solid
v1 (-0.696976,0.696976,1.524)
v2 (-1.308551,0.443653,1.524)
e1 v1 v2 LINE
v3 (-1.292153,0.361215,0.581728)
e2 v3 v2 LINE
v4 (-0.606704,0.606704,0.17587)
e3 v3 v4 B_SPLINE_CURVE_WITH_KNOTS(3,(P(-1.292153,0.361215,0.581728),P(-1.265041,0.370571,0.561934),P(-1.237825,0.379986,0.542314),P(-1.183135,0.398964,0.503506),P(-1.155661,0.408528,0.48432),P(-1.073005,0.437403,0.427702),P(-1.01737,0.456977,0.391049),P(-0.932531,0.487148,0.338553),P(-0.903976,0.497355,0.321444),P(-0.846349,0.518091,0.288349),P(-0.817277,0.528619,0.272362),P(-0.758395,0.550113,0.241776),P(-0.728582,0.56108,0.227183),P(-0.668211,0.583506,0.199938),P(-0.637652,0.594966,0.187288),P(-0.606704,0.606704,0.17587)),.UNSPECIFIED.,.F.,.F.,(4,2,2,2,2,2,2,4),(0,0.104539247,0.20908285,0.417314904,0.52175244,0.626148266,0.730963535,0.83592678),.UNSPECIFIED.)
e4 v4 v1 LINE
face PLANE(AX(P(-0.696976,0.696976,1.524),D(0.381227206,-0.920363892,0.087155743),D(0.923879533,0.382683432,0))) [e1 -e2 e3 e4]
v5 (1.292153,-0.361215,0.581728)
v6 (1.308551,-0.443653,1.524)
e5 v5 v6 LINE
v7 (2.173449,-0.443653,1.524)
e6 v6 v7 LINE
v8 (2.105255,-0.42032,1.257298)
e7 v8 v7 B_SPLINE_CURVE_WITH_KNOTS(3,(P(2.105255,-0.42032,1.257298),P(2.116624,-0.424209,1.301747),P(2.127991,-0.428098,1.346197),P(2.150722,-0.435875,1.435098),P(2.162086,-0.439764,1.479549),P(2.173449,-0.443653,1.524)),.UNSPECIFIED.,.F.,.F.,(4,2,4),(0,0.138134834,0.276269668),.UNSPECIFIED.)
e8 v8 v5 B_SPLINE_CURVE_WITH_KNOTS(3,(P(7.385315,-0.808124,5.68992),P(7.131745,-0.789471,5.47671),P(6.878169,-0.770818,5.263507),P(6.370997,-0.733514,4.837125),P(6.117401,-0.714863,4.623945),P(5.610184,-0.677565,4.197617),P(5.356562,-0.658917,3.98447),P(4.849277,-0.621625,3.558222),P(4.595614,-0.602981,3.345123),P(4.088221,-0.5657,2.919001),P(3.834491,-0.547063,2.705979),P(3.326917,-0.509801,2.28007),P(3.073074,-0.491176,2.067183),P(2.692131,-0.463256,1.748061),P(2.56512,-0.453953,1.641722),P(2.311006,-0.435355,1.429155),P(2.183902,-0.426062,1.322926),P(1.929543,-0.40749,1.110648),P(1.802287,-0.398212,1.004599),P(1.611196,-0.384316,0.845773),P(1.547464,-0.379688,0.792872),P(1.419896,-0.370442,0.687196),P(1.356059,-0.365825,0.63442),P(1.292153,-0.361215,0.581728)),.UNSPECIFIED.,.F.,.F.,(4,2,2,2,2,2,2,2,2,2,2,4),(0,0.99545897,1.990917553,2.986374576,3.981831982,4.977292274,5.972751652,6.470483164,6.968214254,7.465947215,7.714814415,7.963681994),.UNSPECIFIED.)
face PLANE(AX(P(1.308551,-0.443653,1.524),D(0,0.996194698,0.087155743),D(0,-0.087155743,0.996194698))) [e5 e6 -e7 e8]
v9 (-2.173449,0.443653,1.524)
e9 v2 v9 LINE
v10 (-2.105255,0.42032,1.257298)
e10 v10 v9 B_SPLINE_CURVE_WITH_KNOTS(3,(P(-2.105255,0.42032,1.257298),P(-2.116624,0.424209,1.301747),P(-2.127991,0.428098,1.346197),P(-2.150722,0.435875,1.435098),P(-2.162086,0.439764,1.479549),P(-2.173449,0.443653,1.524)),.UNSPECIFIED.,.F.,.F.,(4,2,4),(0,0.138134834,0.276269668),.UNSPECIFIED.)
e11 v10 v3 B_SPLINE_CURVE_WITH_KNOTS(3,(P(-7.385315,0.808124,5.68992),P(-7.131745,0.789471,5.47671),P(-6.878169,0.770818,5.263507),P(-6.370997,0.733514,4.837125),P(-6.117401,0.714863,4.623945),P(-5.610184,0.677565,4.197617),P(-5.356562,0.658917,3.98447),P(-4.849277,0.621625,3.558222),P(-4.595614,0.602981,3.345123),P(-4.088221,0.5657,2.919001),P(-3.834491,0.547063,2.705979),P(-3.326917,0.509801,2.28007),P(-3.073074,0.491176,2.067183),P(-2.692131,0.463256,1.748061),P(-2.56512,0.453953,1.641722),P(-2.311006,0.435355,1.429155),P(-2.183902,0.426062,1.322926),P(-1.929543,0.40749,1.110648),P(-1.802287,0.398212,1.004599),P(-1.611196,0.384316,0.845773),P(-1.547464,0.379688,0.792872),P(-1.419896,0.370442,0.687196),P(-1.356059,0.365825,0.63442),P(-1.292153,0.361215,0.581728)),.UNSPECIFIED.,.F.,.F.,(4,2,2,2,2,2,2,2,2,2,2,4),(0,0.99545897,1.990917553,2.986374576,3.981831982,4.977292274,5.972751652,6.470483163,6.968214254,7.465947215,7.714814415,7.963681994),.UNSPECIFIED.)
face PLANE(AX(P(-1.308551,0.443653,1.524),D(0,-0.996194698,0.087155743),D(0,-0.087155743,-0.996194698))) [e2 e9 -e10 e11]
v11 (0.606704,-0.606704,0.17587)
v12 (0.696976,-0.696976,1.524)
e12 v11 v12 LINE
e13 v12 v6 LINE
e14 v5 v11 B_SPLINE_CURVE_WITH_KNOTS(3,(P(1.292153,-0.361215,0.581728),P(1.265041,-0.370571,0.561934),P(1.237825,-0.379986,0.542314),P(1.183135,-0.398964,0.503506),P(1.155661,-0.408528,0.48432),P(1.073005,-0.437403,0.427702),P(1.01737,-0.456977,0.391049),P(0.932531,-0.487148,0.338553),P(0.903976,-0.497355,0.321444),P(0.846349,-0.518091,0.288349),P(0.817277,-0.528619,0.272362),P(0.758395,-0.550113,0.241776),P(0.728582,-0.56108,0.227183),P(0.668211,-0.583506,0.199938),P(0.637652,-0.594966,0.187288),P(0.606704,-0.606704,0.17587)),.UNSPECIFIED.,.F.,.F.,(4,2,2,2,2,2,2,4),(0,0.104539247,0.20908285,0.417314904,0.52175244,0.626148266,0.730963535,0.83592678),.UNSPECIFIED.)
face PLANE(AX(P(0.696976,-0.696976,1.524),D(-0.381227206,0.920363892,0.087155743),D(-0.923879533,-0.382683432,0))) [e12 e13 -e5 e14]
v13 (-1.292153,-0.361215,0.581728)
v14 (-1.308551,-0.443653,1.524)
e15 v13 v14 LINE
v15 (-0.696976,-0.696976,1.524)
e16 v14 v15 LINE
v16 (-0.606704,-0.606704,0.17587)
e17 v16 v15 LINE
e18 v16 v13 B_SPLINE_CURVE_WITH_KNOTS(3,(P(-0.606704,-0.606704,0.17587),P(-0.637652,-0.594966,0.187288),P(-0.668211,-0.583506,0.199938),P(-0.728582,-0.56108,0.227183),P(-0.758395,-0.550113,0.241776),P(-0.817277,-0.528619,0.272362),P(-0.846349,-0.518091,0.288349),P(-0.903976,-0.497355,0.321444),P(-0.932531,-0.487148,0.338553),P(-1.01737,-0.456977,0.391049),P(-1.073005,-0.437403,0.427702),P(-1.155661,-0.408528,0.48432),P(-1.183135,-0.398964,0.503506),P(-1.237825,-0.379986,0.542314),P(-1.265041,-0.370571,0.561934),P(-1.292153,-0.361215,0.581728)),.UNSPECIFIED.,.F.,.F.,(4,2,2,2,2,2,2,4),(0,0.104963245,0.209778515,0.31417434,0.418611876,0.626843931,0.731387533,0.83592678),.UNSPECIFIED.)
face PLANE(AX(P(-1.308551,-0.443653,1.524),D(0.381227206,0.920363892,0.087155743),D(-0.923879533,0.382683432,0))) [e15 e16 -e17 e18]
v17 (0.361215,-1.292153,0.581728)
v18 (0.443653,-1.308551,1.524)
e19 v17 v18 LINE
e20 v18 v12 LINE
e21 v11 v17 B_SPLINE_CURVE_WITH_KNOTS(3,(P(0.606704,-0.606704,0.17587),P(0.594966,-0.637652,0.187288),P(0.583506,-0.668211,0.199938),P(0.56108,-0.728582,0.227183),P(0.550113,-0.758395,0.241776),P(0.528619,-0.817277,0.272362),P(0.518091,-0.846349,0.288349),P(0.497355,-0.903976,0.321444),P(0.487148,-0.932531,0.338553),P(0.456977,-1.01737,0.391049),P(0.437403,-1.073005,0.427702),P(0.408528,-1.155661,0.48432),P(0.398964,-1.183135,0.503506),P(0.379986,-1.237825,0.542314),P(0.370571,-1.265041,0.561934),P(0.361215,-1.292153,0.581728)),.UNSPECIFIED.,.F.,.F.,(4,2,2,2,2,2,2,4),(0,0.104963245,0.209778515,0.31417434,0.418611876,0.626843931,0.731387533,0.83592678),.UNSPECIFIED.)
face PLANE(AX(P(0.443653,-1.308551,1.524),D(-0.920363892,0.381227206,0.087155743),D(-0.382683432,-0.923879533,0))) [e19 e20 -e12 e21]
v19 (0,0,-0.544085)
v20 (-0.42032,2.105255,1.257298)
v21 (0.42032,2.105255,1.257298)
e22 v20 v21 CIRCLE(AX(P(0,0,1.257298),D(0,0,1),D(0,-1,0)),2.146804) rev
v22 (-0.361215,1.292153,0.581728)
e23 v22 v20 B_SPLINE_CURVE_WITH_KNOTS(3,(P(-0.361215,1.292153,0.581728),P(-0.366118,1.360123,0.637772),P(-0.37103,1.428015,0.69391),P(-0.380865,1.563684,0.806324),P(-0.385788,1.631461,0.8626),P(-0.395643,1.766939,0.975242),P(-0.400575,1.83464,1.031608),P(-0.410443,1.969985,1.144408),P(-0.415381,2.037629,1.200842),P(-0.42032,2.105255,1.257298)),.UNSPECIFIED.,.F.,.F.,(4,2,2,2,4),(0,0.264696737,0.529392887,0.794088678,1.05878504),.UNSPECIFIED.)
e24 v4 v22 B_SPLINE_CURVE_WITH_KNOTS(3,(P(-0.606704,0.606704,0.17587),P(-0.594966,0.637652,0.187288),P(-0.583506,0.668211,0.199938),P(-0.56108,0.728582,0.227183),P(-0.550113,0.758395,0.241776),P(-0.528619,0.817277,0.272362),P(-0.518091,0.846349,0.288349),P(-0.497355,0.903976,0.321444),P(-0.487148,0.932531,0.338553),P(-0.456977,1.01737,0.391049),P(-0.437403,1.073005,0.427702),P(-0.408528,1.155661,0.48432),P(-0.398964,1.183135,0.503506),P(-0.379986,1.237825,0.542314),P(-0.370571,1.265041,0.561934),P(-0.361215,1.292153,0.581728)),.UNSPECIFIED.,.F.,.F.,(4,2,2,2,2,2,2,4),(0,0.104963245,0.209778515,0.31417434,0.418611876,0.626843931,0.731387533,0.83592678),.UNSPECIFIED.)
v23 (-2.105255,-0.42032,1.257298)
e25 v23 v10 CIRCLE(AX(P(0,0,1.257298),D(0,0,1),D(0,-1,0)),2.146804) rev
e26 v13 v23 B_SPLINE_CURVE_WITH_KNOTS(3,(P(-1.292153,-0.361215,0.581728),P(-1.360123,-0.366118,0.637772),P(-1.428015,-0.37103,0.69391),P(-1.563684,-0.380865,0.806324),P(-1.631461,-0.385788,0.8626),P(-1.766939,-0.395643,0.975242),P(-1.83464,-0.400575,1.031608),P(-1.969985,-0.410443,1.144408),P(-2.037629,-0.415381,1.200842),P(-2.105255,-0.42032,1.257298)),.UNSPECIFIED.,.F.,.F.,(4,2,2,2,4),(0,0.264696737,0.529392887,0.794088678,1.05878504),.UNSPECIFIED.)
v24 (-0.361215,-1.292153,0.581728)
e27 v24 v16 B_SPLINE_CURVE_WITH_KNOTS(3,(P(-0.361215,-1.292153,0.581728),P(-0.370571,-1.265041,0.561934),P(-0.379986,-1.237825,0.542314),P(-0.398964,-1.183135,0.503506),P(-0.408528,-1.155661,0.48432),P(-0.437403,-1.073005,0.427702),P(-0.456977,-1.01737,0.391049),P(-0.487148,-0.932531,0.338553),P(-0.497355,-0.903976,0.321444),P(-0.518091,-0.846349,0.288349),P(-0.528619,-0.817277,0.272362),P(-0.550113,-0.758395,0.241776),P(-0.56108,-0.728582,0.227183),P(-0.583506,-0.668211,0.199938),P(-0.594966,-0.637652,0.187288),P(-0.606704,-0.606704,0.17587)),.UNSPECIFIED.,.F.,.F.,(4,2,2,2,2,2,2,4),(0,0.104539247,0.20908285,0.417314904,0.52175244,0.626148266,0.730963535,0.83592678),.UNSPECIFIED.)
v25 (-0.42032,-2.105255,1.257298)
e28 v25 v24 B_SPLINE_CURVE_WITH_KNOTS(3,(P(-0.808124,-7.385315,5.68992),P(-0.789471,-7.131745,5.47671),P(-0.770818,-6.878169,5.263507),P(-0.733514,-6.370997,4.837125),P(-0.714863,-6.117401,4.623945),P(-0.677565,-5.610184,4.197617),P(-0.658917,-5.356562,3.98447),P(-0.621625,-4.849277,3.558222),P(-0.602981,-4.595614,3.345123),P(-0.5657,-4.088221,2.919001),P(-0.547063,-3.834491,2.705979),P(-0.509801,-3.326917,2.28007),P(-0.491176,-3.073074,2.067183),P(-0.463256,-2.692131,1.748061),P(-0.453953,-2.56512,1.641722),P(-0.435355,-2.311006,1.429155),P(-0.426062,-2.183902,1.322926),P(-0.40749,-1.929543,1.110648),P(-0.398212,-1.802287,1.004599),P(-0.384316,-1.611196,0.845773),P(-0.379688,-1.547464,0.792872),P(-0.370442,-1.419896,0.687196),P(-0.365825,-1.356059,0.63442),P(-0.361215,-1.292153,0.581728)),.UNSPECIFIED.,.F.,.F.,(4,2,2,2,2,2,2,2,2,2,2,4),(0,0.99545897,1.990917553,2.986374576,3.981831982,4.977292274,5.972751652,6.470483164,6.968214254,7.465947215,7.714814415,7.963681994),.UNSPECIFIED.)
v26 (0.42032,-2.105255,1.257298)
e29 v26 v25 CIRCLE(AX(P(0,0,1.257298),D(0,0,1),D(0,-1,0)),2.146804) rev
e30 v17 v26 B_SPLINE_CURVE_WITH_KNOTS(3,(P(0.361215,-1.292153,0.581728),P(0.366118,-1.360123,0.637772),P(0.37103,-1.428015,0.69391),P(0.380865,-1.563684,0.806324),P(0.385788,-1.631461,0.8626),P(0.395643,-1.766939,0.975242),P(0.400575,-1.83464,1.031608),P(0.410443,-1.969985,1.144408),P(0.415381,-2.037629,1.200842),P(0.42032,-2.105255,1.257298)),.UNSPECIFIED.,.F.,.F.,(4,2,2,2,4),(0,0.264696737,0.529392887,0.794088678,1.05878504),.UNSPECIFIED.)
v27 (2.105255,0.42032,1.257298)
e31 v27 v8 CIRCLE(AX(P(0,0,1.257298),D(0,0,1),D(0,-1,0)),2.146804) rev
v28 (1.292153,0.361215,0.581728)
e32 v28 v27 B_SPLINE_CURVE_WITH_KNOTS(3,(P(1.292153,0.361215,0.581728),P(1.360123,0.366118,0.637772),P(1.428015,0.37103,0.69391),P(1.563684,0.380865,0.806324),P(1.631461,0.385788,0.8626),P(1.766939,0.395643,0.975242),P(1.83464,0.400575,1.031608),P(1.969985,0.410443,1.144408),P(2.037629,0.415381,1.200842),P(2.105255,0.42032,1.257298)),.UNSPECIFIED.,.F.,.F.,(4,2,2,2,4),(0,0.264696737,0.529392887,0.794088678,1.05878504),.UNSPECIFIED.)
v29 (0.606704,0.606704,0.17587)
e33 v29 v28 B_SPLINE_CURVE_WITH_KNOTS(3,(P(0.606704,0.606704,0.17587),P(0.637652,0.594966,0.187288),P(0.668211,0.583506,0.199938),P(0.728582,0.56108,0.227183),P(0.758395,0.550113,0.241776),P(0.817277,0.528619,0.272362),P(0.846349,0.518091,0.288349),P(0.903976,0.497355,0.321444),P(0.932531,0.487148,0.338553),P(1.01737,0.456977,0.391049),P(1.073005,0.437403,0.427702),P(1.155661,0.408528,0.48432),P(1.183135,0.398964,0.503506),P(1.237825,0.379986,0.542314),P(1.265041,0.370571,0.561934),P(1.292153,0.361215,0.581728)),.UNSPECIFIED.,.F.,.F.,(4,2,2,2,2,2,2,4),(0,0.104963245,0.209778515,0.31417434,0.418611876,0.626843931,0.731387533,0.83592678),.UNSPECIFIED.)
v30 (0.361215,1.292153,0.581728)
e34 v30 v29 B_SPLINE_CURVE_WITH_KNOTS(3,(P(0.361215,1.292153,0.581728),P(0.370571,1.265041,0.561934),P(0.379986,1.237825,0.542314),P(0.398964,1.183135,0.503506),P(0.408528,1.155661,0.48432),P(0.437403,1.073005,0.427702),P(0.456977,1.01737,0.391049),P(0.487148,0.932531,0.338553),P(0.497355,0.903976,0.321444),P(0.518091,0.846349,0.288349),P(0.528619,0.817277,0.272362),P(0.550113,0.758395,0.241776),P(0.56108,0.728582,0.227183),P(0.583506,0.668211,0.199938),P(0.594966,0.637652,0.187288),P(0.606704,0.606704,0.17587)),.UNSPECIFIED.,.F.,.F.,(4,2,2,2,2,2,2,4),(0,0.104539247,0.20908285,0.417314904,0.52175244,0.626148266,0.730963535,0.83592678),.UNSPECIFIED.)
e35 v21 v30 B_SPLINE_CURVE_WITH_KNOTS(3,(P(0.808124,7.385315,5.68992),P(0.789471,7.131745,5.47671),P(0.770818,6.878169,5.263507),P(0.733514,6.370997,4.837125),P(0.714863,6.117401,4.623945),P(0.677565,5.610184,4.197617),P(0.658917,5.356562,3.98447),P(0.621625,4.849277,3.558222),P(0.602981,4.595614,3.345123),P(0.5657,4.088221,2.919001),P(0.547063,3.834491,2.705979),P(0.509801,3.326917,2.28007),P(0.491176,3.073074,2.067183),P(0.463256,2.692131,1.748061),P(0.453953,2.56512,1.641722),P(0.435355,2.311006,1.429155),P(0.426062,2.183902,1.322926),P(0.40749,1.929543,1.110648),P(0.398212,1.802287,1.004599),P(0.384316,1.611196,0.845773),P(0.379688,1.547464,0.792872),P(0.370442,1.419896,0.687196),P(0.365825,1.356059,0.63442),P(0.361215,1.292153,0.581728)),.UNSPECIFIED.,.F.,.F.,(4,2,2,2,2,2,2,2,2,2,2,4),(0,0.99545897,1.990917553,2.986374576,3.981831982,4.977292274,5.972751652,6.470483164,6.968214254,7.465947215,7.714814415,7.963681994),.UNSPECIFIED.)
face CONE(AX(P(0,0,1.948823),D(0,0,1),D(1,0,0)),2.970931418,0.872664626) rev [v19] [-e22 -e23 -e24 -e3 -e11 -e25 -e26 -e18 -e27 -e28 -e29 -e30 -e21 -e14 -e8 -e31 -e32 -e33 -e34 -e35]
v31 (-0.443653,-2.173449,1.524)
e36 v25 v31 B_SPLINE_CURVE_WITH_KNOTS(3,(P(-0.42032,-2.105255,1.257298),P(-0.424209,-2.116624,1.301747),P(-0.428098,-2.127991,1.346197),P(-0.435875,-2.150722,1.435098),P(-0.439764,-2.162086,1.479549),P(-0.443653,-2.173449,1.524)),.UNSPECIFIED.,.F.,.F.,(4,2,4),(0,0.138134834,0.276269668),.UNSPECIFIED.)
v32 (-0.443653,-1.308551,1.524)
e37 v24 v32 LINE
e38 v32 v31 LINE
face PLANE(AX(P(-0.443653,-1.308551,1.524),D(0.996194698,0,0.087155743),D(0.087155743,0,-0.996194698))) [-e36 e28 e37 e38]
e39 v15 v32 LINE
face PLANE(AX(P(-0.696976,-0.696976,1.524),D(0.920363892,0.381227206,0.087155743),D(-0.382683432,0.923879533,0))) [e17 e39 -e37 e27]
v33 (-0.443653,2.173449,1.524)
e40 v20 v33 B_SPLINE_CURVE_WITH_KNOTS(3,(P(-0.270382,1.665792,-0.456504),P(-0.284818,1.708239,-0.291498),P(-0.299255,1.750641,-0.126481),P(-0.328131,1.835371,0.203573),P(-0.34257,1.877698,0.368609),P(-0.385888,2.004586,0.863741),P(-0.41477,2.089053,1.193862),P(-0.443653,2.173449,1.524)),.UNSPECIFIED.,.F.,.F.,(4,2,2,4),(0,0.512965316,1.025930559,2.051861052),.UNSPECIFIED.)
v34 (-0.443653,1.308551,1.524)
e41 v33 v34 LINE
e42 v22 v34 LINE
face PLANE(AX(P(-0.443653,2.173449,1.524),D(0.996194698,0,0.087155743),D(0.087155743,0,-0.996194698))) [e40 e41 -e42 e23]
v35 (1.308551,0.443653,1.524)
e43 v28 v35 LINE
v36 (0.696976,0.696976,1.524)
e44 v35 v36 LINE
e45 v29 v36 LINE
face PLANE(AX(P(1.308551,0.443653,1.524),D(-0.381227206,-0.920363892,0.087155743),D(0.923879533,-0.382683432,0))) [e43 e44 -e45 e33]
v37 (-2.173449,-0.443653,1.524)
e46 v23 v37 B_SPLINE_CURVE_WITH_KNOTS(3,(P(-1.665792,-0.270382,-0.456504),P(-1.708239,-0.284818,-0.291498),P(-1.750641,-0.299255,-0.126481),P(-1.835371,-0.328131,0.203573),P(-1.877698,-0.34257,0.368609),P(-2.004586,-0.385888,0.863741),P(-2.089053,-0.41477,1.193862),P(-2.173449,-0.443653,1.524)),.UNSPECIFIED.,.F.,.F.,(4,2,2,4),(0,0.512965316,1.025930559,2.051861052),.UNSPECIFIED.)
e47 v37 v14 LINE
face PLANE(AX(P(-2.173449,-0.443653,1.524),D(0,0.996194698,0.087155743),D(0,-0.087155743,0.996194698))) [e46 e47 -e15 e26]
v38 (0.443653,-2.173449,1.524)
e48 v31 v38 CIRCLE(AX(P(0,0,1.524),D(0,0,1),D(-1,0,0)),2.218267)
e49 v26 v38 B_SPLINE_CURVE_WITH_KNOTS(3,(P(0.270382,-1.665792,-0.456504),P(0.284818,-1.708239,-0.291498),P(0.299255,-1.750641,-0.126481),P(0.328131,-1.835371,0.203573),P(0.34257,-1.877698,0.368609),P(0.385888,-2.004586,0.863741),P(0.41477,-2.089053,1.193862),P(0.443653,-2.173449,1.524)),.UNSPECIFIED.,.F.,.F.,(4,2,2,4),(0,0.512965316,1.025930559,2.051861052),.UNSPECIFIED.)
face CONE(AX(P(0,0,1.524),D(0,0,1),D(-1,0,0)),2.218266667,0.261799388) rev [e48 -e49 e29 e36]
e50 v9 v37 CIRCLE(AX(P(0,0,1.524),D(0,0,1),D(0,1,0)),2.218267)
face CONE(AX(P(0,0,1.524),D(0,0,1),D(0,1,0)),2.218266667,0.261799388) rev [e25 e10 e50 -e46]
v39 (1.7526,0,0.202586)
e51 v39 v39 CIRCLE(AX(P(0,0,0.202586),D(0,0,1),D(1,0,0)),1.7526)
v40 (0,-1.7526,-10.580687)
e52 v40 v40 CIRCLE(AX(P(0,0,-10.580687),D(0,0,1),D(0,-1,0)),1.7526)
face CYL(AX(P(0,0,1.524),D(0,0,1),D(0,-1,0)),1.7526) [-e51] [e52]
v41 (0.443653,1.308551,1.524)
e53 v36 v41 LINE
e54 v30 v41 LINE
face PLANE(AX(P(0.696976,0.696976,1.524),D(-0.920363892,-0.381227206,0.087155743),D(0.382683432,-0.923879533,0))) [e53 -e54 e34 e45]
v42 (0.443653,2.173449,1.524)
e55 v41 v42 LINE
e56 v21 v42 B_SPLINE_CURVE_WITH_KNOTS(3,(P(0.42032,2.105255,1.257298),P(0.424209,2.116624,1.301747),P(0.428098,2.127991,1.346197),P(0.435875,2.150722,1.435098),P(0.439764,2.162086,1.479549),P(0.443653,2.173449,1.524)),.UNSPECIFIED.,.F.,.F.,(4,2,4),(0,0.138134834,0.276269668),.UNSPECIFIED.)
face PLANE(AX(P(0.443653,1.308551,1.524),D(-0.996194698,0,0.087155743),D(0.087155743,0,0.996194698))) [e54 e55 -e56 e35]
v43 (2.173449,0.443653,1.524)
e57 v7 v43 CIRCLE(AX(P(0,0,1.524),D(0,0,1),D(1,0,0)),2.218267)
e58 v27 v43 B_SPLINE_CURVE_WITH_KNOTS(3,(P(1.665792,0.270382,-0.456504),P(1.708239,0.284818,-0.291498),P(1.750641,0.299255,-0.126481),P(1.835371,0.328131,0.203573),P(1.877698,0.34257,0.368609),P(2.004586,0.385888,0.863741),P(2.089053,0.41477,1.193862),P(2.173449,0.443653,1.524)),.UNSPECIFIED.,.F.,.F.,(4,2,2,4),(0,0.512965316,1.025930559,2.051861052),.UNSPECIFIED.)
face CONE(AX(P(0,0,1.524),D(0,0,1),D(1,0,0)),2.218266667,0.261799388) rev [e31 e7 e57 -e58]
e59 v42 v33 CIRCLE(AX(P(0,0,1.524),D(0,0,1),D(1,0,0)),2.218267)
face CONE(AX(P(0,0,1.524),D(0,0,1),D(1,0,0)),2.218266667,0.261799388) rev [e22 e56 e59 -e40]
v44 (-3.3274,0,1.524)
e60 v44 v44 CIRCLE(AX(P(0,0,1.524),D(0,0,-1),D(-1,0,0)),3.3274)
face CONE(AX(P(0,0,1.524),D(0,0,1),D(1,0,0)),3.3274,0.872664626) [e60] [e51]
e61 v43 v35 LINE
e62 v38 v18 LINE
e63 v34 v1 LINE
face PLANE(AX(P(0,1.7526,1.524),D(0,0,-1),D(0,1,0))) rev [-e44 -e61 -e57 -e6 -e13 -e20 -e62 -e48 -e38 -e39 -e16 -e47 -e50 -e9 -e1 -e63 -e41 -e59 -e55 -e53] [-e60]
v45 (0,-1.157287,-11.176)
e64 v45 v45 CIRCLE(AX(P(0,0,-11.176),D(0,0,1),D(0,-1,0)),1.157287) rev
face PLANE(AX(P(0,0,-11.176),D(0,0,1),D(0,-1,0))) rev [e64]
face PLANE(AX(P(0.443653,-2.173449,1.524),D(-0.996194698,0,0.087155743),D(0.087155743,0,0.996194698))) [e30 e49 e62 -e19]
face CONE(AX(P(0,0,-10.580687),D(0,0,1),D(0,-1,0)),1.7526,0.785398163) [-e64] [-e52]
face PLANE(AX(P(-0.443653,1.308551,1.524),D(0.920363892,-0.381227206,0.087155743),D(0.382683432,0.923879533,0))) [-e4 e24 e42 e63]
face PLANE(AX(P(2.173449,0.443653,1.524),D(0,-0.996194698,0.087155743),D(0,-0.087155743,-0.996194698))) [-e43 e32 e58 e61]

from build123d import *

# Parameters (mm, degrees)
SKETCH1_R          = 3.3274
EXTRUDE3_DEPTH     = 1.524
SKETCH4_W          = 12.7
SKETCH4_H          = 1.7526
CHAMFER1_SIZE      = 0.5953125
SKETCH26_R         = 0.8763
EXTRUDE8_DEPTH     = 1.524
CUT_EXTRUDE3_REACH = 15.544
CIRPATTERN1_COUNT  = 4
DRAFT2_ANGLE       = 5


# Read off the part's stored shape, not the designer's step: Extrude10, Draft1
with BuildPart() as part:
    # Sketch1 → Extrude3 (new body)
    with BuildSketch(Plane.XY):
        with Locations(Location((0, 0, 0), (0, 0, 180))):
            Circle(SKETCH1_R)
    extrude(amount=EXTRUDE3_DEPTH)

    # Sketch11 → Cut-Revolve3 (revolve, cut)
    with BuildSketch(Plane(origin=(0, 0, 0), x_dir=(0, 0, -1), z_dir=(1, 0, 0)), mode=Mode.PRIVATE) as cut_revolve3_sk:
        Polygon((0, 1.511167525), (-1.524, 3.3274), (0, 3.3274), align=None)
    revolve(cut_revolve3_sk.sketch.rotate(Axis((0, 0, -0.441444004), (0, 0, 1)), 90), axis=Axis((0, 0, -0.441444004), (0, 0, 1)), mode=Mode.SUBTRACT)

    # Extrude10 outline → Extrude10 (revolve)
    with BuildSketch(Plane.XZ):
        Polygon((1.7526, 0), (1.7526, 0.202585901), (1.511167525, 0.202585901), (1.511167525, 0), (0, 0), (0, -1.7526), align=None)
    revolve(axis=Axis((0, 0, 0), (0, 0, 1)))



with BuildPart() as body_2:
    # Sketch4 → Revolve1 (revolve)
    with BuildSketch(Plane(origin=(0, 0, 0), x_dir=(0, 0, -1), z_dir=(1, 0, 0)), mode=Mode.PRIVATE) as revolve1_sk:
        with Locations((4.826, 0.8763)):
            Rectangle(SKETCH4_W, SKETCH4_H)
    revolve(revolve1_sk.sketch.rotate(Axis((0, 0, 1.524), (0, 0, -1)), 180), axis=Axis((0, 0, 1.524), (0, 0, -1)))

    # Chamfer1
    chamfer1_edges = [body_2.edges().sort_by_distance(p)[0] for p in [
        (0, 1.7526, -11.176),
    ]]
    chamfer(chamfer1_edges, length=CHAMFER1_SIZE)


with BuildPart() as part_1:
    add(part.part)

    add(body_2.part)  # Extrude8 merges body 2
    # Sketch26 → Extrude8 (add)
    with BuildSketch(Plane.XY.offset(1.524)):
        Circle(SKETCH26_R)
    extrude(amount=-EXTRUDE8_DEPTH)

    # Cut-Extrude3: up to this cone (the profile starts inside it)
    cut_extrude3_end = Plane(origin=(0, 0, 1.524), z_dir=(0, 0, 1)).offset(-2.068083744) * Cone(1.192e-06, 24.522394484, 20.576731167, align=(Align.CENTER, Align.CENTER, Align.MIN), mode=Mode.PRIVATE)
    # Sketch12 → Cut-Extrude3 (cut, up to the surface)
    with BuildSketch(Plane.XY.offset(1.524), mode=Mode.PRIVATE) as cut_extrude3_sk1:
        with BuildLine():
            Line((2.173448579, 0.443653333), (1.308550956, 0.443653333))
            Line((1.308550956, 0.443653333), (0.696975982, 0.696975982))
            Line((0.696975982, 0.696975982), (0.443653333, 1.308550956))
            Line((0.443653333, 1.308550956), (0.443653333, 2.173448579))
            ThreePointArc((0.443653333, 2.173448579), (0.22295568, 2.207033704), (0, 2.218266667))
            Line((0, 2.218266667), (0, 0))
            Line((0, 0), (2.218266667, 0))
            ThreePointArc((2.218266667, 0), (2.207033704, 0.22295568), (2.173448579, 0.443653333))
        make_face()
    cut_extrude3_tool1 = extrude(cut_extrude3_sk1.sketch, amount=-CUT_EXTRUDE3_REACH, mode=Mode.PRIVATE) & cut_extrude3_end
    cut_extrude3 = cut_extrude3_tool1.solids().sort_by_distance((1.741, 0.412282, 1.524))[0]
    add(cut_extrude3, mode=Mode.SUBTRACT)

    # CirPattern1: Cut-Extrude3 ×4 about axis
    cirpattern1_axis = Axis((0, 0, 0), (0, 0, 1))
    for i in range(1, CIRPATTERN1_COUNT):
        add(cut_extrude3.rotate(cirpattern1_axis, i * 360 / CIRPATTERN1_COUNT), mode=Mode.SUBTRACT)

    # Draft1 outline → Draft1 (revolve)
    with BuildSketch(Plane.XZ):
        Polygon((2.218266667, 1.524), (2.146804001, 1.257297702), (2.218266667, 1.257297702), align=None)
    revolve(axis=Axis((0, 0, 0), (0, 0, 1)))

    # Draft2
    draft2_faces = [part_1.faces().sort_by_distance(p)[0] for p in [
        (0.443653333, 1.642629798, 1.204938596),
        (0.576807254, 0.987088954, 0.973802508),
        (0.987088954, 0.576807254, 0.973802508),
        (1.642629798, 0.443653333, 1.204938596),
        (1.642629798, -0.443653333, 1.204938596),
        (0.987088954, -0.576807254, 0.973802508),
        (0.576807254, -0.987088954, 0.973802508),
        (0.443653333, -1.642629798, 1.204938596),
        (-0.443653333, -1.642629798, 1.204938596),
        (-0.576807254, -0.987088954, 0.973802508),
        (-0.987088954, -0.576807254, 0.973802508),
        (-1.642629798, -0.443653333, 1.204938596),
        (-1.642629798, 0.443653333, 1.204938596),
        (-0.987088954, 0.576807254, 0.973802508),
        (-0.576807254, 0.987088954, 0.973802508),
        (-0.443653333, 1.642629798, 1.204938596),
    ]]
    draft(draft2_faces, Plane(origin=(0, 1.7526, 1.524), x_dir=(0, 1, 0), z_dir=(0, 0, 1)), DRAFT2_ANGLE)


solid = part_1.part
